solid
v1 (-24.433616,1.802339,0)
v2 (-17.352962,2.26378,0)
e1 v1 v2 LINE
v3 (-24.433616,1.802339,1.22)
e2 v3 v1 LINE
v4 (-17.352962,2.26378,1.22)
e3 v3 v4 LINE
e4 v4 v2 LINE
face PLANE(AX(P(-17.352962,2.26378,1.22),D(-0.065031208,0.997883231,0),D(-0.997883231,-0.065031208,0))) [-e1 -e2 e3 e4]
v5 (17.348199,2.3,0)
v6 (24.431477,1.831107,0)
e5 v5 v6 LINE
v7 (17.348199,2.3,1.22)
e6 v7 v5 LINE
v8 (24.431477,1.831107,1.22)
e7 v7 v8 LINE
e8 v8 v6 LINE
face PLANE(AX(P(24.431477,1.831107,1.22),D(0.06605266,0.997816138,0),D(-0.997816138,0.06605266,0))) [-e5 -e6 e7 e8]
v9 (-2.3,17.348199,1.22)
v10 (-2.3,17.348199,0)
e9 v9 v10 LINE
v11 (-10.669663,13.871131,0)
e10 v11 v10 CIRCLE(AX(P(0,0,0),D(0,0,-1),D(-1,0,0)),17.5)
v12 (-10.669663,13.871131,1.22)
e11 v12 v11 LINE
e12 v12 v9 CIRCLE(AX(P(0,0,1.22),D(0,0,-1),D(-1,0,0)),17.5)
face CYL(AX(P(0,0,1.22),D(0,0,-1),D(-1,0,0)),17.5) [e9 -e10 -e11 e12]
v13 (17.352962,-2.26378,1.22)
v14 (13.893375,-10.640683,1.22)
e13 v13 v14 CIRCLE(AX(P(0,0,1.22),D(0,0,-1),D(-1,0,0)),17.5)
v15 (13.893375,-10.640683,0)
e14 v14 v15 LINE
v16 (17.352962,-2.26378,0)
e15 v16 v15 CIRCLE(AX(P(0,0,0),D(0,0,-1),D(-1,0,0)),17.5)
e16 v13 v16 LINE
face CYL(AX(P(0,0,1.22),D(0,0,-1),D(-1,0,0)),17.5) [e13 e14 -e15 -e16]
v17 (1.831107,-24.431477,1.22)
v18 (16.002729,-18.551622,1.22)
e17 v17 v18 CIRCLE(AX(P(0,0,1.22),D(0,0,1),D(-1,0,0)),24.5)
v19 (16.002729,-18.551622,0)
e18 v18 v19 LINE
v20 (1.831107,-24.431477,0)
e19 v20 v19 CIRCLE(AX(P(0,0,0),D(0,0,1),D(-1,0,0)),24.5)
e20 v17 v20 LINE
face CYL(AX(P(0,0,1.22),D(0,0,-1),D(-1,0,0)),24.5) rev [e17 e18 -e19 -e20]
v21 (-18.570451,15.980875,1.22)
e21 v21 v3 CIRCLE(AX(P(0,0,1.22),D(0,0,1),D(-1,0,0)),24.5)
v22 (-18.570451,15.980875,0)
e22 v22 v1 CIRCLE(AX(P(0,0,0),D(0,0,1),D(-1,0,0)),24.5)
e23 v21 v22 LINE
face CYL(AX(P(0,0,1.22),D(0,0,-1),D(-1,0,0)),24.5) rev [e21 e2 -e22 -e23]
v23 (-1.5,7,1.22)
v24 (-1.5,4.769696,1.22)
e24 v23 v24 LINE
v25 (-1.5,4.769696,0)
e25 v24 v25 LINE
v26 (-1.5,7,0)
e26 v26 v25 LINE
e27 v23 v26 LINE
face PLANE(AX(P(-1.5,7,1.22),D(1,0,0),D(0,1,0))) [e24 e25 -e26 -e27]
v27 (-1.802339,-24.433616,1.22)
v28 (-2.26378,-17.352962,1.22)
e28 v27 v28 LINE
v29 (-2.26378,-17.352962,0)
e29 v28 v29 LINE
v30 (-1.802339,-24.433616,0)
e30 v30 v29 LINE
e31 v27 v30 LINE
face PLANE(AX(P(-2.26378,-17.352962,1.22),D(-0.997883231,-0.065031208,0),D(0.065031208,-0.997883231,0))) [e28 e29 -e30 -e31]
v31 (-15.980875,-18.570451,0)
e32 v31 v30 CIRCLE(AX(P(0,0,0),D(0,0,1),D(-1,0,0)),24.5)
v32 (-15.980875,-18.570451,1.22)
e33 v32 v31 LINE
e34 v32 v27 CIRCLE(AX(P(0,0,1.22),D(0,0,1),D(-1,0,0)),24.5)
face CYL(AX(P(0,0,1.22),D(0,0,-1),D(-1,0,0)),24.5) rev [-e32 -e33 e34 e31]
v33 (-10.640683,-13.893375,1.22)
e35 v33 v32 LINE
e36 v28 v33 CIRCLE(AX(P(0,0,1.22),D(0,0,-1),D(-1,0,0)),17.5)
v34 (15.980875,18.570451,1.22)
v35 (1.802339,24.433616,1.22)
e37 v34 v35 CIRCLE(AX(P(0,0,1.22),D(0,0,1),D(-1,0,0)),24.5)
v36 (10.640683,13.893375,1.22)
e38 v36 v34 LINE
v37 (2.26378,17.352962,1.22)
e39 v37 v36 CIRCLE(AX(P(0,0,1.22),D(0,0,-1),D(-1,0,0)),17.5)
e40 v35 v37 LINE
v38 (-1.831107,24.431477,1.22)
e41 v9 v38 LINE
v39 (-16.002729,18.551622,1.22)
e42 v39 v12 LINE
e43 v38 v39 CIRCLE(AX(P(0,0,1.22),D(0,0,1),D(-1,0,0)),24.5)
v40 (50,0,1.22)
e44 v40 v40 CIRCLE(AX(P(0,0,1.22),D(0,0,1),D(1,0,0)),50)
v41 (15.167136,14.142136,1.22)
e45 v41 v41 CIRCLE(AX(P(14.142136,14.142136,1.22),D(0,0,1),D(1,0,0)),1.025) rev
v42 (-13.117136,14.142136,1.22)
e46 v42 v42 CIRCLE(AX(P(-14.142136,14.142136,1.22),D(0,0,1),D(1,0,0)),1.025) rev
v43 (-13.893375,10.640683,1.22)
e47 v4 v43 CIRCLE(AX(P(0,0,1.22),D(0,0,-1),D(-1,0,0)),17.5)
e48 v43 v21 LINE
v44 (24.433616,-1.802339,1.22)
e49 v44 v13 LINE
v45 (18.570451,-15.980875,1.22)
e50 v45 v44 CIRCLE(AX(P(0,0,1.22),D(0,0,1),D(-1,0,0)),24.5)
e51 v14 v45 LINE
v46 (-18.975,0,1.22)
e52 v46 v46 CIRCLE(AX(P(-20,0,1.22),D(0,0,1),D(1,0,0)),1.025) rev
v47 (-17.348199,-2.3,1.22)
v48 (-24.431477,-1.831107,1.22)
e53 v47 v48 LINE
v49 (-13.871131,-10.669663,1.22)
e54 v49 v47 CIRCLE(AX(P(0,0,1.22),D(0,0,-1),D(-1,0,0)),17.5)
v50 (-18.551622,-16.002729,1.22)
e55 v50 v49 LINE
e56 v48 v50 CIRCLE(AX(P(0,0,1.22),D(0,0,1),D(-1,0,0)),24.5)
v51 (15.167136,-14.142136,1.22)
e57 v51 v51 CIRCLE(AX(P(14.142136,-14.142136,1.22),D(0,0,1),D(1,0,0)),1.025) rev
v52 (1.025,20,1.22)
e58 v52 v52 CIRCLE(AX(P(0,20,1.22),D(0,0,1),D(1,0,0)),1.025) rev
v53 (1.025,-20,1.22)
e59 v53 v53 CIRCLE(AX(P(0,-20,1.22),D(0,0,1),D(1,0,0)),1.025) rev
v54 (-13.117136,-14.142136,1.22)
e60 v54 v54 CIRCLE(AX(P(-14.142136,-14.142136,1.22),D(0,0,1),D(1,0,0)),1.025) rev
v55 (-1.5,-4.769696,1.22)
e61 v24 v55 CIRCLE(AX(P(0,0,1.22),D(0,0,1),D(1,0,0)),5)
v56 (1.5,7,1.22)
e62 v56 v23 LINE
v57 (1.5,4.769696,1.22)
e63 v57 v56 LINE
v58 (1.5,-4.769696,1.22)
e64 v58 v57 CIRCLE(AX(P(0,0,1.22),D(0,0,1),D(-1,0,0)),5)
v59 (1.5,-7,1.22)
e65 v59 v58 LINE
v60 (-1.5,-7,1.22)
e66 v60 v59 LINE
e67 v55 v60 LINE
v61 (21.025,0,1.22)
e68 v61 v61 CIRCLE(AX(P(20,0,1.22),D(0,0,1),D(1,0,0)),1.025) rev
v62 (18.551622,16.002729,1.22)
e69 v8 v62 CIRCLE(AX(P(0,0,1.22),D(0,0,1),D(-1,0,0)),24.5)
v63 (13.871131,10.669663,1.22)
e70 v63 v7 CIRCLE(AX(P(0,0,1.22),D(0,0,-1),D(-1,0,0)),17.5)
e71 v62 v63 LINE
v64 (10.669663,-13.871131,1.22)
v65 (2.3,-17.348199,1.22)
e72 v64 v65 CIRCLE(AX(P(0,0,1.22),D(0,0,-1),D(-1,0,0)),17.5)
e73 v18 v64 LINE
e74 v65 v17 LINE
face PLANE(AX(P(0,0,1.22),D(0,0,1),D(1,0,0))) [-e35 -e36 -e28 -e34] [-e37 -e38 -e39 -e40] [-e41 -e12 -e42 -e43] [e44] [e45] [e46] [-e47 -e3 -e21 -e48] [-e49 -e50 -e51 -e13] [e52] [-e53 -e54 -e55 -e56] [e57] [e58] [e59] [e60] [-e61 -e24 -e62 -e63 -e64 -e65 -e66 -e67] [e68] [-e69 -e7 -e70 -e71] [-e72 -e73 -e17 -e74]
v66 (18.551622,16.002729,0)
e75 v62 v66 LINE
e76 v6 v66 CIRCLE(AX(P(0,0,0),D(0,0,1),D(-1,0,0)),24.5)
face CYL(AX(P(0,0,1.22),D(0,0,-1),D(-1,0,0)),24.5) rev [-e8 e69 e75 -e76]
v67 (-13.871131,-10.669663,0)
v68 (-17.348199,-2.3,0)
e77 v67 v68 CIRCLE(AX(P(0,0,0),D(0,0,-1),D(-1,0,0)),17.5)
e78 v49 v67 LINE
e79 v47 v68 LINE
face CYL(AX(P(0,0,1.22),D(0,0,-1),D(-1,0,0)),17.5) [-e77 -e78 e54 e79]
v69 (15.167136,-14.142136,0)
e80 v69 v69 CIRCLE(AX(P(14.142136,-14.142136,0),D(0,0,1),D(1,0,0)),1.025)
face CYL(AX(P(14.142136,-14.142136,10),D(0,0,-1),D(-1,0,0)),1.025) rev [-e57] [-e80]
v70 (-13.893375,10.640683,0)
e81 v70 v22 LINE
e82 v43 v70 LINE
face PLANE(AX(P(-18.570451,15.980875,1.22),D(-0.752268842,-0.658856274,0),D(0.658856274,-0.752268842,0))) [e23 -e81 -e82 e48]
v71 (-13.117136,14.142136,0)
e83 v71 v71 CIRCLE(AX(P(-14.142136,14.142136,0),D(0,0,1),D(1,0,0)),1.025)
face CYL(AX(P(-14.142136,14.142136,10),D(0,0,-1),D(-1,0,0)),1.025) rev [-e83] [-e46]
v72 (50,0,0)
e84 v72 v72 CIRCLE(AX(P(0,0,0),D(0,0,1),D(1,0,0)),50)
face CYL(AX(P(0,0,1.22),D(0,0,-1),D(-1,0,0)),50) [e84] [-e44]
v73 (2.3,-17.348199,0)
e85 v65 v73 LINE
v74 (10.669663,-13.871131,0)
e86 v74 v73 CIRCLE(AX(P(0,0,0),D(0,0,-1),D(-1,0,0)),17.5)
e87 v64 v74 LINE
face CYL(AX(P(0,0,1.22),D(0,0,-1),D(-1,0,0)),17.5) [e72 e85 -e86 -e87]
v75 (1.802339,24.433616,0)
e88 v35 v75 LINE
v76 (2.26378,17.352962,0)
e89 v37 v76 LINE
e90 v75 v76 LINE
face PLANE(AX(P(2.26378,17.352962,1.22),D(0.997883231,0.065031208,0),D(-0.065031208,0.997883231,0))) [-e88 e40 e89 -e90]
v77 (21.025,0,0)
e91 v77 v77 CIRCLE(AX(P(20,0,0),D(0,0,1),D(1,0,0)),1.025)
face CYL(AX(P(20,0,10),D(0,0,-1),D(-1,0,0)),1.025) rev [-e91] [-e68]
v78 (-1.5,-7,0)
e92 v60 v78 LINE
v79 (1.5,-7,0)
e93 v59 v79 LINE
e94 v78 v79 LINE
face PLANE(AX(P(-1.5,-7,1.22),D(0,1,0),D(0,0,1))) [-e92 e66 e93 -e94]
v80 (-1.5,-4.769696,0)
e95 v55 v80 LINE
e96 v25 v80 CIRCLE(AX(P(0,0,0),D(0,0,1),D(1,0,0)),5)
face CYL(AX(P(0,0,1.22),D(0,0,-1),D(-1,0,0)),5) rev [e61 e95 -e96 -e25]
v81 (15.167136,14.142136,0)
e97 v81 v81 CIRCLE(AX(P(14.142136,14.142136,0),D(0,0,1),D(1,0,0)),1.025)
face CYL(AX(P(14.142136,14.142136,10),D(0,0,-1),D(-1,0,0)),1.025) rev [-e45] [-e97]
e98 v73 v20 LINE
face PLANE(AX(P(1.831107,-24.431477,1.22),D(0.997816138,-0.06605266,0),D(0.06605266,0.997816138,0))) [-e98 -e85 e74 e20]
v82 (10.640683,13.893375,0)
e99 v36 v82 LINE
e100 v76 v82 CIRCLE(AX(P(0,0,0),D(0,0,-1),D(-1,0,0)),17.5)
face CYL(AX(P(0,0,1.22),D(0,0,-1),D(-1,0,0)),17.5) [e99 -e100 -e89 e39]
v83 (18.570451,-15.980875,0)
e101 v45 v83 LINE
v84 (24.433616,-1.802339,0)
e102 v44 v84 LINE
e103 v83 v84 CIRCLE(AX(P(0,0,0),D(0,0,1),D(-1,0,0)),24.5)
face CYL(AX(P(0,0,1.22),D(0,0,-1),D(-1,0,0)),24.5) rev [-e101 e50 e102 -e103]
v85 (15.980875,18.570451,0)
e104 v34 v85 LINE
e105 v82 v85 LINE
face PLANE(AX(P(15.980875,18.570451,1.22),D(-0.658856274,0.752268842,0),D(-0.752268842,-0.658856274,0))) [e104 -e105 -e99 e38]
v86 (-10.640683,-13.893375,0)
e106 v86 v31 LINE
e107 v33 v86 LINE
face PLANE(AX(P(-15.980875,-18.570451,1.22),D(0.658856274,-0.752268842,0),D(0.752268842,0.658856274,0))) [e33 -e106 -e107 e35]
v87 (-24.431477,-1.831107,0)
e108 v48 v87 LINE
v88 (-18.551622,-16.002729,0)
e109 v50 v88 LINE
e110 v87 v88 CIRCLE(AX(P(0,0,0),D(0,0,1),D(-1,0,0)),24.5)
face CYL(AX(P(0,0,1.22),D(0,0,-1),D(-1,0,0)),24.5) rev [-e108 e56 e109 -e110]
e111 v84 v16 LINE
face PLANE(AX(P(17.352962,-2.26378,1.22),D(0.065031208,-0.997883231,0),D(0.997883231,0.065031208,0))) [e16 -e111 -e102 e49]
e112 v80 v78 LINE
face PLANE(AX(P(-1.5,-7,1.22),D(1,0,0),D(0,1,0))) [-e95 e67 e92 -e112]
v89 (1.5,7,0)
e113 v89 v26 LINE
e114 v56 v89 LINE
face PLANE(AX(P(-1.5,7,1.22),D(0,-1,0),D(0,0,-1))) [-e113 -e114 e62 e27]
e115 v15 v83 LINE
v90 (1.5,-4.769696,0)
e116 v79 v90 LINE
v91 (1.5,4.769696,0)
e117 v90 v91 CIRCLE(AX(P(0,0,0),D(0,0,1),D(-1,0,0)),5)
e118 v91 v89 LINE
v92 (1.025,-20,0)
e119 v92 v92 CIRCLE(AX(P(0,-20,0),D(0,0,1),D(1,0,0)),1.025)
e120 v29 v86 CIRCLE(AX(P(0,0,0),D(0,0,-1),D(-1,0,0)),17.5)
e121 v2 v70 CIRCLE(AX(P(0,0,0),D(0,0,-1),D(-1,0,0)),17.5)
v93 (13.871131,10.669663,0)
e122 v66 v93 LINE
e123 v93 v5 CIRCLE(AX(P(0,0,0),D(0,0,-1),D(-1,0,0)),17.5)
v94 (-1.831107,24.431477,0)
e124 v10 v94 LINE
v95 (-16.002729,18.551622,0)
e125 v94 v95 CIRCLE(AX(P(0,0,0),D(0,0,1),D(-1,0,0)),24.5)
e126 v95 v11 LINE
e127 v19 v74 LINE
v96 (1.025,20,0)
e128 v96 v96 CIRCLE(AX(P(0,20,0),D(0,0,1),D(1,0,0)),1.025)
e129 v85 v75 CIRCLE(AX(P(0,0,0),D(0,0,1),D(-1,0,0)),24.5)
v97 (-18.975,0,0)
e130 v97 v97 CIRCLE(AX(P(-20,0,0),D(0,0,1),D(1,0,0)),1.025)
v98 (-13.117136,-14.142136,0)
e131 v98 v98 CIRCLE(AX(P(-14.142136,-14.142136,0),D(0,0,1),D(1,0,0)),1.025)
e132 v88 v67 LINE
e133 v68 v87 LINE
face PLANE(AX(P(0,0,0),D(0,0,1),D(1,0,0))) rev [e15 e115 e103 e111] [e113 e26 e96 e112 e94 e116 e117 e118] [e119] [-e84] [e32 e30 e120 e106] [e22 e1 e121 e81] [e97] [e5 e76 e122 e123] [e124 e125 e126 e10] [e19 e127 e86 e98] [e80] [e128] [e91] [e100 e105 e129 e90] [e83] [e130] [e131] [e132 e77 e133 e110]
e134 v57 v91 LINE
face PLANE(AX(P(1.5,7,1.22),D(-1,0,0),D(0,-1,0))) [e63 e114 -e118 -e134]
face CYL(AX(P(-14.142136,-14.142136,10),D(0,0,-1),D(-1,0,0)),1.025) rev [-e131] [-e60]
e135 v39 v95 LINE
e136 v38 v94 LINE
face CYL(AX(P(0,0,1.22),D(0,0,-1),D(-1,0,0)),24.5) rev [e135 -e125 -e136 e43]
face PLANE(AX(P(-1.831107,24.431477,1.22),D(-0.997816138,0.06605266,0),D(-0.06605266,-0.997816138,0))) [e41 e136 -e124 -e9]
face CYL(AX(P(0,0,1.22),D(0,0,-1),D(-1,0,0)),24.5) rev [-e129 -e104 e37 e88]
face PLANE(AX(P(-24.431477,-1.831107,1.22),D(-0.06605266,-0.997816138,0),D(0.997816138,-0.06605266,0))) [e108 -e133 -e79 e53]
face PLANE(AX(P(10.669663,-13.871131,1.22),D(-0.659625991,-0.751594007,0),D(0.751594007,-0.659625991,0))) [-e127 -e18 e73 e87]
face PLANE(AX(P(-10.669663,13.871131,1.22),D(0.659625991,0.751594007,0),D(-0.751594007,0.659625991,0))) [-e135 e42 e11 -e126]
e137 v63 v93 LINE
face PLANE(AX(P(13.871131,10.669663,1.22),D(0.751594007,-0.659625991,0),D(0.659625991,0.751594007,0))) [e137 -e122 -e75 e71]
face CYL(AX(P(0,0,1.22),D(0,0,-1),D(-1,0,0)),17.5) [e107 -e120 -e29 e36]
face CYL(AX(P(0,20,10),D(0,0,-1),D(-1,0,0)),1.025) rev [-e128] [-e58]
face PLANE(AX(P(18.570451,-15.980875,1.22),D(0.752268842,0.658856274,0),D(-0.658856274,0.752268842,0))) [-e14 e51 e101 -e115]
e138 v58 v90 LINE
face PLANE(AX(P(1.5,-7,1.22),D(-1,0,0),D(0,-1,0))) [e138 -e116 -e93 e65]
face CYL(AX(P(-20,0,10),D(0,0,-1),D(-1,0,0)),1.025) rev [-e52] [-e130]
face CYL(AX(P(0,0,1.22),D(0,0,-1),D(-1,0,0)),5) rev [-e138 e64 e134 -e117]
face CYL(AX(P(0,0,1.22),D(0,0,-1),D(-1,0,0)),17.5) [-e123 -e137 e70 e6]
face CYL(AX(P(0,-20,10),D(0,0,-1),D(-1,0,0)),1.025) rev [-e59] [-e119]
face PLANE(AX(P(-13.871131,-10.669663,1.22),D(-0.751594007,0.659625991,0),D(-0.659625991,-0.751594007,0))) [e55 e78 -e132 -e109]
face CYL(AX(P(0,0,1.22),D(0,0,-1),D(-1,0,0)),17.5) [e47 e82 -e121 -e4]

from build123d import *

# Parameters (mm, degrees)
BOSS_EXTRUDE1_OUTLINE_R = 50
BOSS_EXTRUDE1_DEPTH     = 1.22
SKETCH2_R               = 1.025
CUT_EXTRUDE2_DEPTH      = 10


# Read off the part's stored shape, not the designer's step: Boss-Extrude1
with BuildPart() as part:
    # Boss-Extrude1 outline → Boss-Extrude1 (new body)
    with BuildSketch(Plane.XY):
        Circle(BOSS_EXTRUDE1_OUTLINE_R)
        with BuildLine():
            ThreePointArc((-10.640683383, -13.893374577), (-6.680080661, -16.174873179), (-2.263779528, -17.352962348))
            Line((-2.263779528, -17.352962348), (-1.802339331, -24.433615634))
            ThreePointArc((-1.802339331, -24.433615634), (-9.36241701, -22.64056421), (-15.980874836, -18.570450707))
            Line((-15.980874836, -18.570450707), (-10.640683383, -13.893374577))
        make_face(mode=Mode.SUBTRACT)
        with BuildLine():
            ThreePointArc((-17.348198754, -2.3), (-16.160892844, -6.713832175), (-13.871131205, -10.669663495))
            Line((-13.871131205, -10.669663495), (-18.551621667, -16.00272894))
            ThreePointArc((-18.551621667, -16.00272894), (-22.629525039, -9.389067926), (-24.431476591, -1.831106659))
            Line((-24.431476591, -1.831106659), (-17.348198754, -2.3))
        make_face(mode=Mode.SUBTRACT)
        with BuildLine():
            ThreePointArc((2.3, -17.348198754), (6.713832175, -16.160892844), (10.669663495, -13.871131205))
            Line((10.669663495, -13.871131205), (16.00272894, -18.551621667))
            ThreePointArc((16.00272894, -18.551621667), (9.389067926, -22.629525039), (1.831106659, -24.431476591))
            Line((1.831106659, -24.431476591), (2.3, -17.348198754))
        make_face(mode=Mode.SUBTRACT)
        with BuildLine():
            ThreePointArc((13.893374577, -10.640683383), (16.174873179, -6.680080661), (17.352962348, -2.263779528))
            Line((17.352962348, -2.263779528), (24.433615634, -1.802339331))
            ThreePointArc((24.433615634, -1.802339331), (22.64056421, -9.36241701), (18.570450707, -15.980874836))
            Line((18.570450707, -15.980874836), (13.893374577, -10.640683383))
        make_face(mode=Mode.SUBTRACT)
        with BuildLine():
            ThreePointArc((-13.893374577, 10.640683383), (-16.174873179, 6.680080661), (-17.352962348, 2.263779528))
            Line((-17.352962348, 2.263779528), (-24.433615634, 1.802339331))
            ThreePointArc((-24.433615634, 1.802339331), (-22.64056421, 9.36241701), (-18.570450707, 15.980874836))
            Line((-18.570450707, 15.980874836), (-13.893374577, 10.640683383))
        make_face(mode=Mode.SUBTRACT)
        with BuildLine():
            ThreePointArc((-2.3, 17.348198754), (-6.713832175, 16.160892844), (-10.669663495, 13.871131205))
            Line((-10.669663495, 13.871131205), (-16.00272894, 18.551621667))
            ThreePointArc((-16.00272894, 18.551621667), (-9.389067926, 22.629525039), (-1.831106659, 24.431476591))
            Line((-1.831106659, 24.431476591), (-2.3, 17.348198754))
        make_face(mode=Mode.SUBTRACT)
        with BuildLine():
            ThreePointArc((-1.5, -4.769696007), (-5, 0), (-1.5, 4.769696007))
            Line((-1.5, 4.769696007), (-1.5, 7))
            Line((-1.5, 7), (1.5, 7))
            Line((1.5, 7), (1.5, 4.769696007))
            ThreePointArc((1.5, 4.769696007), (5, 0), (1.5, -4.769696007))
            Line((1.5, -4.769696007), (1.5, -7))
            Line((1.5, -7), (-1.5, -7))
            Line((-1.5, -7), (-1.5, -4.769696007))
        make_face(mode=Mode.SUBTRACT)
        with BuildLine():
            ThreePointArc((17.348198754, 2.3), (16.160892844, 6.713832175), (13.871131205, 10.669663495))
            Line((13.871131205, 10.669663495), (18.551621667, 16.00272894))
            ThreePointArc((18.551621667, 16.00272894), (22.629525039, 9.389067926), (24.431476591, 1.831106659))
            Line((24.431476591, 1.831106659), (17.348198754, 2.3))
        make_face(mode=Mode.SUBTRACT)
        with BuildLine():
            ThreePointArc((10.640683383, 13.893374577), (6.680080661, 16.174873179), (2.263779528, 17.352962348))
            Line((2.263779528, 17.352962348), (1.802339331, 24.433615634))
            ThreePointArc((1.802339331, 24.433615634), (9.36241701, 22.64056421), (15.980874836, 18.570450707))
            Line((15.980874836, 18.570450707), (10.640683383, 13.893374577))
        make_face(mode=Mode.SUBTRACT)
    extrude(amount=BOSS_EXTRUDE1_DEPTH)

    # Sketch2 → Cut-Extrude2 (cut)
    with BuildSketch(Plane.XY):
        with Locations((0, 20)):
            Circle(SKETCH2_R)
        with Locations((14.142135624, 14.142135624)):
            Circle(SKETCH2_R)
        with Locations((20, 0)):
            Circle(SKETCH2_R)
        with Locations((14.142135624, -14.142135624)):
            Circle(SKETCH2_R)
        with Locations((0, -20)):
            Circle(SKETCH2_R)
        with Locations((-14.142135624, -14.142135624)):
            Circle(SKETCH2_R)
        with Locations((-20, 0)):
            Circle(SKETCH2_R)
        with Locations((-14.142135624, 14.142135624)):
            Circle(SKETCH2_R)
    extrude(amount=CUT_EXTRUDE2_DEPTH, mode=Mode.SUBTRACT)


solid = part.part
